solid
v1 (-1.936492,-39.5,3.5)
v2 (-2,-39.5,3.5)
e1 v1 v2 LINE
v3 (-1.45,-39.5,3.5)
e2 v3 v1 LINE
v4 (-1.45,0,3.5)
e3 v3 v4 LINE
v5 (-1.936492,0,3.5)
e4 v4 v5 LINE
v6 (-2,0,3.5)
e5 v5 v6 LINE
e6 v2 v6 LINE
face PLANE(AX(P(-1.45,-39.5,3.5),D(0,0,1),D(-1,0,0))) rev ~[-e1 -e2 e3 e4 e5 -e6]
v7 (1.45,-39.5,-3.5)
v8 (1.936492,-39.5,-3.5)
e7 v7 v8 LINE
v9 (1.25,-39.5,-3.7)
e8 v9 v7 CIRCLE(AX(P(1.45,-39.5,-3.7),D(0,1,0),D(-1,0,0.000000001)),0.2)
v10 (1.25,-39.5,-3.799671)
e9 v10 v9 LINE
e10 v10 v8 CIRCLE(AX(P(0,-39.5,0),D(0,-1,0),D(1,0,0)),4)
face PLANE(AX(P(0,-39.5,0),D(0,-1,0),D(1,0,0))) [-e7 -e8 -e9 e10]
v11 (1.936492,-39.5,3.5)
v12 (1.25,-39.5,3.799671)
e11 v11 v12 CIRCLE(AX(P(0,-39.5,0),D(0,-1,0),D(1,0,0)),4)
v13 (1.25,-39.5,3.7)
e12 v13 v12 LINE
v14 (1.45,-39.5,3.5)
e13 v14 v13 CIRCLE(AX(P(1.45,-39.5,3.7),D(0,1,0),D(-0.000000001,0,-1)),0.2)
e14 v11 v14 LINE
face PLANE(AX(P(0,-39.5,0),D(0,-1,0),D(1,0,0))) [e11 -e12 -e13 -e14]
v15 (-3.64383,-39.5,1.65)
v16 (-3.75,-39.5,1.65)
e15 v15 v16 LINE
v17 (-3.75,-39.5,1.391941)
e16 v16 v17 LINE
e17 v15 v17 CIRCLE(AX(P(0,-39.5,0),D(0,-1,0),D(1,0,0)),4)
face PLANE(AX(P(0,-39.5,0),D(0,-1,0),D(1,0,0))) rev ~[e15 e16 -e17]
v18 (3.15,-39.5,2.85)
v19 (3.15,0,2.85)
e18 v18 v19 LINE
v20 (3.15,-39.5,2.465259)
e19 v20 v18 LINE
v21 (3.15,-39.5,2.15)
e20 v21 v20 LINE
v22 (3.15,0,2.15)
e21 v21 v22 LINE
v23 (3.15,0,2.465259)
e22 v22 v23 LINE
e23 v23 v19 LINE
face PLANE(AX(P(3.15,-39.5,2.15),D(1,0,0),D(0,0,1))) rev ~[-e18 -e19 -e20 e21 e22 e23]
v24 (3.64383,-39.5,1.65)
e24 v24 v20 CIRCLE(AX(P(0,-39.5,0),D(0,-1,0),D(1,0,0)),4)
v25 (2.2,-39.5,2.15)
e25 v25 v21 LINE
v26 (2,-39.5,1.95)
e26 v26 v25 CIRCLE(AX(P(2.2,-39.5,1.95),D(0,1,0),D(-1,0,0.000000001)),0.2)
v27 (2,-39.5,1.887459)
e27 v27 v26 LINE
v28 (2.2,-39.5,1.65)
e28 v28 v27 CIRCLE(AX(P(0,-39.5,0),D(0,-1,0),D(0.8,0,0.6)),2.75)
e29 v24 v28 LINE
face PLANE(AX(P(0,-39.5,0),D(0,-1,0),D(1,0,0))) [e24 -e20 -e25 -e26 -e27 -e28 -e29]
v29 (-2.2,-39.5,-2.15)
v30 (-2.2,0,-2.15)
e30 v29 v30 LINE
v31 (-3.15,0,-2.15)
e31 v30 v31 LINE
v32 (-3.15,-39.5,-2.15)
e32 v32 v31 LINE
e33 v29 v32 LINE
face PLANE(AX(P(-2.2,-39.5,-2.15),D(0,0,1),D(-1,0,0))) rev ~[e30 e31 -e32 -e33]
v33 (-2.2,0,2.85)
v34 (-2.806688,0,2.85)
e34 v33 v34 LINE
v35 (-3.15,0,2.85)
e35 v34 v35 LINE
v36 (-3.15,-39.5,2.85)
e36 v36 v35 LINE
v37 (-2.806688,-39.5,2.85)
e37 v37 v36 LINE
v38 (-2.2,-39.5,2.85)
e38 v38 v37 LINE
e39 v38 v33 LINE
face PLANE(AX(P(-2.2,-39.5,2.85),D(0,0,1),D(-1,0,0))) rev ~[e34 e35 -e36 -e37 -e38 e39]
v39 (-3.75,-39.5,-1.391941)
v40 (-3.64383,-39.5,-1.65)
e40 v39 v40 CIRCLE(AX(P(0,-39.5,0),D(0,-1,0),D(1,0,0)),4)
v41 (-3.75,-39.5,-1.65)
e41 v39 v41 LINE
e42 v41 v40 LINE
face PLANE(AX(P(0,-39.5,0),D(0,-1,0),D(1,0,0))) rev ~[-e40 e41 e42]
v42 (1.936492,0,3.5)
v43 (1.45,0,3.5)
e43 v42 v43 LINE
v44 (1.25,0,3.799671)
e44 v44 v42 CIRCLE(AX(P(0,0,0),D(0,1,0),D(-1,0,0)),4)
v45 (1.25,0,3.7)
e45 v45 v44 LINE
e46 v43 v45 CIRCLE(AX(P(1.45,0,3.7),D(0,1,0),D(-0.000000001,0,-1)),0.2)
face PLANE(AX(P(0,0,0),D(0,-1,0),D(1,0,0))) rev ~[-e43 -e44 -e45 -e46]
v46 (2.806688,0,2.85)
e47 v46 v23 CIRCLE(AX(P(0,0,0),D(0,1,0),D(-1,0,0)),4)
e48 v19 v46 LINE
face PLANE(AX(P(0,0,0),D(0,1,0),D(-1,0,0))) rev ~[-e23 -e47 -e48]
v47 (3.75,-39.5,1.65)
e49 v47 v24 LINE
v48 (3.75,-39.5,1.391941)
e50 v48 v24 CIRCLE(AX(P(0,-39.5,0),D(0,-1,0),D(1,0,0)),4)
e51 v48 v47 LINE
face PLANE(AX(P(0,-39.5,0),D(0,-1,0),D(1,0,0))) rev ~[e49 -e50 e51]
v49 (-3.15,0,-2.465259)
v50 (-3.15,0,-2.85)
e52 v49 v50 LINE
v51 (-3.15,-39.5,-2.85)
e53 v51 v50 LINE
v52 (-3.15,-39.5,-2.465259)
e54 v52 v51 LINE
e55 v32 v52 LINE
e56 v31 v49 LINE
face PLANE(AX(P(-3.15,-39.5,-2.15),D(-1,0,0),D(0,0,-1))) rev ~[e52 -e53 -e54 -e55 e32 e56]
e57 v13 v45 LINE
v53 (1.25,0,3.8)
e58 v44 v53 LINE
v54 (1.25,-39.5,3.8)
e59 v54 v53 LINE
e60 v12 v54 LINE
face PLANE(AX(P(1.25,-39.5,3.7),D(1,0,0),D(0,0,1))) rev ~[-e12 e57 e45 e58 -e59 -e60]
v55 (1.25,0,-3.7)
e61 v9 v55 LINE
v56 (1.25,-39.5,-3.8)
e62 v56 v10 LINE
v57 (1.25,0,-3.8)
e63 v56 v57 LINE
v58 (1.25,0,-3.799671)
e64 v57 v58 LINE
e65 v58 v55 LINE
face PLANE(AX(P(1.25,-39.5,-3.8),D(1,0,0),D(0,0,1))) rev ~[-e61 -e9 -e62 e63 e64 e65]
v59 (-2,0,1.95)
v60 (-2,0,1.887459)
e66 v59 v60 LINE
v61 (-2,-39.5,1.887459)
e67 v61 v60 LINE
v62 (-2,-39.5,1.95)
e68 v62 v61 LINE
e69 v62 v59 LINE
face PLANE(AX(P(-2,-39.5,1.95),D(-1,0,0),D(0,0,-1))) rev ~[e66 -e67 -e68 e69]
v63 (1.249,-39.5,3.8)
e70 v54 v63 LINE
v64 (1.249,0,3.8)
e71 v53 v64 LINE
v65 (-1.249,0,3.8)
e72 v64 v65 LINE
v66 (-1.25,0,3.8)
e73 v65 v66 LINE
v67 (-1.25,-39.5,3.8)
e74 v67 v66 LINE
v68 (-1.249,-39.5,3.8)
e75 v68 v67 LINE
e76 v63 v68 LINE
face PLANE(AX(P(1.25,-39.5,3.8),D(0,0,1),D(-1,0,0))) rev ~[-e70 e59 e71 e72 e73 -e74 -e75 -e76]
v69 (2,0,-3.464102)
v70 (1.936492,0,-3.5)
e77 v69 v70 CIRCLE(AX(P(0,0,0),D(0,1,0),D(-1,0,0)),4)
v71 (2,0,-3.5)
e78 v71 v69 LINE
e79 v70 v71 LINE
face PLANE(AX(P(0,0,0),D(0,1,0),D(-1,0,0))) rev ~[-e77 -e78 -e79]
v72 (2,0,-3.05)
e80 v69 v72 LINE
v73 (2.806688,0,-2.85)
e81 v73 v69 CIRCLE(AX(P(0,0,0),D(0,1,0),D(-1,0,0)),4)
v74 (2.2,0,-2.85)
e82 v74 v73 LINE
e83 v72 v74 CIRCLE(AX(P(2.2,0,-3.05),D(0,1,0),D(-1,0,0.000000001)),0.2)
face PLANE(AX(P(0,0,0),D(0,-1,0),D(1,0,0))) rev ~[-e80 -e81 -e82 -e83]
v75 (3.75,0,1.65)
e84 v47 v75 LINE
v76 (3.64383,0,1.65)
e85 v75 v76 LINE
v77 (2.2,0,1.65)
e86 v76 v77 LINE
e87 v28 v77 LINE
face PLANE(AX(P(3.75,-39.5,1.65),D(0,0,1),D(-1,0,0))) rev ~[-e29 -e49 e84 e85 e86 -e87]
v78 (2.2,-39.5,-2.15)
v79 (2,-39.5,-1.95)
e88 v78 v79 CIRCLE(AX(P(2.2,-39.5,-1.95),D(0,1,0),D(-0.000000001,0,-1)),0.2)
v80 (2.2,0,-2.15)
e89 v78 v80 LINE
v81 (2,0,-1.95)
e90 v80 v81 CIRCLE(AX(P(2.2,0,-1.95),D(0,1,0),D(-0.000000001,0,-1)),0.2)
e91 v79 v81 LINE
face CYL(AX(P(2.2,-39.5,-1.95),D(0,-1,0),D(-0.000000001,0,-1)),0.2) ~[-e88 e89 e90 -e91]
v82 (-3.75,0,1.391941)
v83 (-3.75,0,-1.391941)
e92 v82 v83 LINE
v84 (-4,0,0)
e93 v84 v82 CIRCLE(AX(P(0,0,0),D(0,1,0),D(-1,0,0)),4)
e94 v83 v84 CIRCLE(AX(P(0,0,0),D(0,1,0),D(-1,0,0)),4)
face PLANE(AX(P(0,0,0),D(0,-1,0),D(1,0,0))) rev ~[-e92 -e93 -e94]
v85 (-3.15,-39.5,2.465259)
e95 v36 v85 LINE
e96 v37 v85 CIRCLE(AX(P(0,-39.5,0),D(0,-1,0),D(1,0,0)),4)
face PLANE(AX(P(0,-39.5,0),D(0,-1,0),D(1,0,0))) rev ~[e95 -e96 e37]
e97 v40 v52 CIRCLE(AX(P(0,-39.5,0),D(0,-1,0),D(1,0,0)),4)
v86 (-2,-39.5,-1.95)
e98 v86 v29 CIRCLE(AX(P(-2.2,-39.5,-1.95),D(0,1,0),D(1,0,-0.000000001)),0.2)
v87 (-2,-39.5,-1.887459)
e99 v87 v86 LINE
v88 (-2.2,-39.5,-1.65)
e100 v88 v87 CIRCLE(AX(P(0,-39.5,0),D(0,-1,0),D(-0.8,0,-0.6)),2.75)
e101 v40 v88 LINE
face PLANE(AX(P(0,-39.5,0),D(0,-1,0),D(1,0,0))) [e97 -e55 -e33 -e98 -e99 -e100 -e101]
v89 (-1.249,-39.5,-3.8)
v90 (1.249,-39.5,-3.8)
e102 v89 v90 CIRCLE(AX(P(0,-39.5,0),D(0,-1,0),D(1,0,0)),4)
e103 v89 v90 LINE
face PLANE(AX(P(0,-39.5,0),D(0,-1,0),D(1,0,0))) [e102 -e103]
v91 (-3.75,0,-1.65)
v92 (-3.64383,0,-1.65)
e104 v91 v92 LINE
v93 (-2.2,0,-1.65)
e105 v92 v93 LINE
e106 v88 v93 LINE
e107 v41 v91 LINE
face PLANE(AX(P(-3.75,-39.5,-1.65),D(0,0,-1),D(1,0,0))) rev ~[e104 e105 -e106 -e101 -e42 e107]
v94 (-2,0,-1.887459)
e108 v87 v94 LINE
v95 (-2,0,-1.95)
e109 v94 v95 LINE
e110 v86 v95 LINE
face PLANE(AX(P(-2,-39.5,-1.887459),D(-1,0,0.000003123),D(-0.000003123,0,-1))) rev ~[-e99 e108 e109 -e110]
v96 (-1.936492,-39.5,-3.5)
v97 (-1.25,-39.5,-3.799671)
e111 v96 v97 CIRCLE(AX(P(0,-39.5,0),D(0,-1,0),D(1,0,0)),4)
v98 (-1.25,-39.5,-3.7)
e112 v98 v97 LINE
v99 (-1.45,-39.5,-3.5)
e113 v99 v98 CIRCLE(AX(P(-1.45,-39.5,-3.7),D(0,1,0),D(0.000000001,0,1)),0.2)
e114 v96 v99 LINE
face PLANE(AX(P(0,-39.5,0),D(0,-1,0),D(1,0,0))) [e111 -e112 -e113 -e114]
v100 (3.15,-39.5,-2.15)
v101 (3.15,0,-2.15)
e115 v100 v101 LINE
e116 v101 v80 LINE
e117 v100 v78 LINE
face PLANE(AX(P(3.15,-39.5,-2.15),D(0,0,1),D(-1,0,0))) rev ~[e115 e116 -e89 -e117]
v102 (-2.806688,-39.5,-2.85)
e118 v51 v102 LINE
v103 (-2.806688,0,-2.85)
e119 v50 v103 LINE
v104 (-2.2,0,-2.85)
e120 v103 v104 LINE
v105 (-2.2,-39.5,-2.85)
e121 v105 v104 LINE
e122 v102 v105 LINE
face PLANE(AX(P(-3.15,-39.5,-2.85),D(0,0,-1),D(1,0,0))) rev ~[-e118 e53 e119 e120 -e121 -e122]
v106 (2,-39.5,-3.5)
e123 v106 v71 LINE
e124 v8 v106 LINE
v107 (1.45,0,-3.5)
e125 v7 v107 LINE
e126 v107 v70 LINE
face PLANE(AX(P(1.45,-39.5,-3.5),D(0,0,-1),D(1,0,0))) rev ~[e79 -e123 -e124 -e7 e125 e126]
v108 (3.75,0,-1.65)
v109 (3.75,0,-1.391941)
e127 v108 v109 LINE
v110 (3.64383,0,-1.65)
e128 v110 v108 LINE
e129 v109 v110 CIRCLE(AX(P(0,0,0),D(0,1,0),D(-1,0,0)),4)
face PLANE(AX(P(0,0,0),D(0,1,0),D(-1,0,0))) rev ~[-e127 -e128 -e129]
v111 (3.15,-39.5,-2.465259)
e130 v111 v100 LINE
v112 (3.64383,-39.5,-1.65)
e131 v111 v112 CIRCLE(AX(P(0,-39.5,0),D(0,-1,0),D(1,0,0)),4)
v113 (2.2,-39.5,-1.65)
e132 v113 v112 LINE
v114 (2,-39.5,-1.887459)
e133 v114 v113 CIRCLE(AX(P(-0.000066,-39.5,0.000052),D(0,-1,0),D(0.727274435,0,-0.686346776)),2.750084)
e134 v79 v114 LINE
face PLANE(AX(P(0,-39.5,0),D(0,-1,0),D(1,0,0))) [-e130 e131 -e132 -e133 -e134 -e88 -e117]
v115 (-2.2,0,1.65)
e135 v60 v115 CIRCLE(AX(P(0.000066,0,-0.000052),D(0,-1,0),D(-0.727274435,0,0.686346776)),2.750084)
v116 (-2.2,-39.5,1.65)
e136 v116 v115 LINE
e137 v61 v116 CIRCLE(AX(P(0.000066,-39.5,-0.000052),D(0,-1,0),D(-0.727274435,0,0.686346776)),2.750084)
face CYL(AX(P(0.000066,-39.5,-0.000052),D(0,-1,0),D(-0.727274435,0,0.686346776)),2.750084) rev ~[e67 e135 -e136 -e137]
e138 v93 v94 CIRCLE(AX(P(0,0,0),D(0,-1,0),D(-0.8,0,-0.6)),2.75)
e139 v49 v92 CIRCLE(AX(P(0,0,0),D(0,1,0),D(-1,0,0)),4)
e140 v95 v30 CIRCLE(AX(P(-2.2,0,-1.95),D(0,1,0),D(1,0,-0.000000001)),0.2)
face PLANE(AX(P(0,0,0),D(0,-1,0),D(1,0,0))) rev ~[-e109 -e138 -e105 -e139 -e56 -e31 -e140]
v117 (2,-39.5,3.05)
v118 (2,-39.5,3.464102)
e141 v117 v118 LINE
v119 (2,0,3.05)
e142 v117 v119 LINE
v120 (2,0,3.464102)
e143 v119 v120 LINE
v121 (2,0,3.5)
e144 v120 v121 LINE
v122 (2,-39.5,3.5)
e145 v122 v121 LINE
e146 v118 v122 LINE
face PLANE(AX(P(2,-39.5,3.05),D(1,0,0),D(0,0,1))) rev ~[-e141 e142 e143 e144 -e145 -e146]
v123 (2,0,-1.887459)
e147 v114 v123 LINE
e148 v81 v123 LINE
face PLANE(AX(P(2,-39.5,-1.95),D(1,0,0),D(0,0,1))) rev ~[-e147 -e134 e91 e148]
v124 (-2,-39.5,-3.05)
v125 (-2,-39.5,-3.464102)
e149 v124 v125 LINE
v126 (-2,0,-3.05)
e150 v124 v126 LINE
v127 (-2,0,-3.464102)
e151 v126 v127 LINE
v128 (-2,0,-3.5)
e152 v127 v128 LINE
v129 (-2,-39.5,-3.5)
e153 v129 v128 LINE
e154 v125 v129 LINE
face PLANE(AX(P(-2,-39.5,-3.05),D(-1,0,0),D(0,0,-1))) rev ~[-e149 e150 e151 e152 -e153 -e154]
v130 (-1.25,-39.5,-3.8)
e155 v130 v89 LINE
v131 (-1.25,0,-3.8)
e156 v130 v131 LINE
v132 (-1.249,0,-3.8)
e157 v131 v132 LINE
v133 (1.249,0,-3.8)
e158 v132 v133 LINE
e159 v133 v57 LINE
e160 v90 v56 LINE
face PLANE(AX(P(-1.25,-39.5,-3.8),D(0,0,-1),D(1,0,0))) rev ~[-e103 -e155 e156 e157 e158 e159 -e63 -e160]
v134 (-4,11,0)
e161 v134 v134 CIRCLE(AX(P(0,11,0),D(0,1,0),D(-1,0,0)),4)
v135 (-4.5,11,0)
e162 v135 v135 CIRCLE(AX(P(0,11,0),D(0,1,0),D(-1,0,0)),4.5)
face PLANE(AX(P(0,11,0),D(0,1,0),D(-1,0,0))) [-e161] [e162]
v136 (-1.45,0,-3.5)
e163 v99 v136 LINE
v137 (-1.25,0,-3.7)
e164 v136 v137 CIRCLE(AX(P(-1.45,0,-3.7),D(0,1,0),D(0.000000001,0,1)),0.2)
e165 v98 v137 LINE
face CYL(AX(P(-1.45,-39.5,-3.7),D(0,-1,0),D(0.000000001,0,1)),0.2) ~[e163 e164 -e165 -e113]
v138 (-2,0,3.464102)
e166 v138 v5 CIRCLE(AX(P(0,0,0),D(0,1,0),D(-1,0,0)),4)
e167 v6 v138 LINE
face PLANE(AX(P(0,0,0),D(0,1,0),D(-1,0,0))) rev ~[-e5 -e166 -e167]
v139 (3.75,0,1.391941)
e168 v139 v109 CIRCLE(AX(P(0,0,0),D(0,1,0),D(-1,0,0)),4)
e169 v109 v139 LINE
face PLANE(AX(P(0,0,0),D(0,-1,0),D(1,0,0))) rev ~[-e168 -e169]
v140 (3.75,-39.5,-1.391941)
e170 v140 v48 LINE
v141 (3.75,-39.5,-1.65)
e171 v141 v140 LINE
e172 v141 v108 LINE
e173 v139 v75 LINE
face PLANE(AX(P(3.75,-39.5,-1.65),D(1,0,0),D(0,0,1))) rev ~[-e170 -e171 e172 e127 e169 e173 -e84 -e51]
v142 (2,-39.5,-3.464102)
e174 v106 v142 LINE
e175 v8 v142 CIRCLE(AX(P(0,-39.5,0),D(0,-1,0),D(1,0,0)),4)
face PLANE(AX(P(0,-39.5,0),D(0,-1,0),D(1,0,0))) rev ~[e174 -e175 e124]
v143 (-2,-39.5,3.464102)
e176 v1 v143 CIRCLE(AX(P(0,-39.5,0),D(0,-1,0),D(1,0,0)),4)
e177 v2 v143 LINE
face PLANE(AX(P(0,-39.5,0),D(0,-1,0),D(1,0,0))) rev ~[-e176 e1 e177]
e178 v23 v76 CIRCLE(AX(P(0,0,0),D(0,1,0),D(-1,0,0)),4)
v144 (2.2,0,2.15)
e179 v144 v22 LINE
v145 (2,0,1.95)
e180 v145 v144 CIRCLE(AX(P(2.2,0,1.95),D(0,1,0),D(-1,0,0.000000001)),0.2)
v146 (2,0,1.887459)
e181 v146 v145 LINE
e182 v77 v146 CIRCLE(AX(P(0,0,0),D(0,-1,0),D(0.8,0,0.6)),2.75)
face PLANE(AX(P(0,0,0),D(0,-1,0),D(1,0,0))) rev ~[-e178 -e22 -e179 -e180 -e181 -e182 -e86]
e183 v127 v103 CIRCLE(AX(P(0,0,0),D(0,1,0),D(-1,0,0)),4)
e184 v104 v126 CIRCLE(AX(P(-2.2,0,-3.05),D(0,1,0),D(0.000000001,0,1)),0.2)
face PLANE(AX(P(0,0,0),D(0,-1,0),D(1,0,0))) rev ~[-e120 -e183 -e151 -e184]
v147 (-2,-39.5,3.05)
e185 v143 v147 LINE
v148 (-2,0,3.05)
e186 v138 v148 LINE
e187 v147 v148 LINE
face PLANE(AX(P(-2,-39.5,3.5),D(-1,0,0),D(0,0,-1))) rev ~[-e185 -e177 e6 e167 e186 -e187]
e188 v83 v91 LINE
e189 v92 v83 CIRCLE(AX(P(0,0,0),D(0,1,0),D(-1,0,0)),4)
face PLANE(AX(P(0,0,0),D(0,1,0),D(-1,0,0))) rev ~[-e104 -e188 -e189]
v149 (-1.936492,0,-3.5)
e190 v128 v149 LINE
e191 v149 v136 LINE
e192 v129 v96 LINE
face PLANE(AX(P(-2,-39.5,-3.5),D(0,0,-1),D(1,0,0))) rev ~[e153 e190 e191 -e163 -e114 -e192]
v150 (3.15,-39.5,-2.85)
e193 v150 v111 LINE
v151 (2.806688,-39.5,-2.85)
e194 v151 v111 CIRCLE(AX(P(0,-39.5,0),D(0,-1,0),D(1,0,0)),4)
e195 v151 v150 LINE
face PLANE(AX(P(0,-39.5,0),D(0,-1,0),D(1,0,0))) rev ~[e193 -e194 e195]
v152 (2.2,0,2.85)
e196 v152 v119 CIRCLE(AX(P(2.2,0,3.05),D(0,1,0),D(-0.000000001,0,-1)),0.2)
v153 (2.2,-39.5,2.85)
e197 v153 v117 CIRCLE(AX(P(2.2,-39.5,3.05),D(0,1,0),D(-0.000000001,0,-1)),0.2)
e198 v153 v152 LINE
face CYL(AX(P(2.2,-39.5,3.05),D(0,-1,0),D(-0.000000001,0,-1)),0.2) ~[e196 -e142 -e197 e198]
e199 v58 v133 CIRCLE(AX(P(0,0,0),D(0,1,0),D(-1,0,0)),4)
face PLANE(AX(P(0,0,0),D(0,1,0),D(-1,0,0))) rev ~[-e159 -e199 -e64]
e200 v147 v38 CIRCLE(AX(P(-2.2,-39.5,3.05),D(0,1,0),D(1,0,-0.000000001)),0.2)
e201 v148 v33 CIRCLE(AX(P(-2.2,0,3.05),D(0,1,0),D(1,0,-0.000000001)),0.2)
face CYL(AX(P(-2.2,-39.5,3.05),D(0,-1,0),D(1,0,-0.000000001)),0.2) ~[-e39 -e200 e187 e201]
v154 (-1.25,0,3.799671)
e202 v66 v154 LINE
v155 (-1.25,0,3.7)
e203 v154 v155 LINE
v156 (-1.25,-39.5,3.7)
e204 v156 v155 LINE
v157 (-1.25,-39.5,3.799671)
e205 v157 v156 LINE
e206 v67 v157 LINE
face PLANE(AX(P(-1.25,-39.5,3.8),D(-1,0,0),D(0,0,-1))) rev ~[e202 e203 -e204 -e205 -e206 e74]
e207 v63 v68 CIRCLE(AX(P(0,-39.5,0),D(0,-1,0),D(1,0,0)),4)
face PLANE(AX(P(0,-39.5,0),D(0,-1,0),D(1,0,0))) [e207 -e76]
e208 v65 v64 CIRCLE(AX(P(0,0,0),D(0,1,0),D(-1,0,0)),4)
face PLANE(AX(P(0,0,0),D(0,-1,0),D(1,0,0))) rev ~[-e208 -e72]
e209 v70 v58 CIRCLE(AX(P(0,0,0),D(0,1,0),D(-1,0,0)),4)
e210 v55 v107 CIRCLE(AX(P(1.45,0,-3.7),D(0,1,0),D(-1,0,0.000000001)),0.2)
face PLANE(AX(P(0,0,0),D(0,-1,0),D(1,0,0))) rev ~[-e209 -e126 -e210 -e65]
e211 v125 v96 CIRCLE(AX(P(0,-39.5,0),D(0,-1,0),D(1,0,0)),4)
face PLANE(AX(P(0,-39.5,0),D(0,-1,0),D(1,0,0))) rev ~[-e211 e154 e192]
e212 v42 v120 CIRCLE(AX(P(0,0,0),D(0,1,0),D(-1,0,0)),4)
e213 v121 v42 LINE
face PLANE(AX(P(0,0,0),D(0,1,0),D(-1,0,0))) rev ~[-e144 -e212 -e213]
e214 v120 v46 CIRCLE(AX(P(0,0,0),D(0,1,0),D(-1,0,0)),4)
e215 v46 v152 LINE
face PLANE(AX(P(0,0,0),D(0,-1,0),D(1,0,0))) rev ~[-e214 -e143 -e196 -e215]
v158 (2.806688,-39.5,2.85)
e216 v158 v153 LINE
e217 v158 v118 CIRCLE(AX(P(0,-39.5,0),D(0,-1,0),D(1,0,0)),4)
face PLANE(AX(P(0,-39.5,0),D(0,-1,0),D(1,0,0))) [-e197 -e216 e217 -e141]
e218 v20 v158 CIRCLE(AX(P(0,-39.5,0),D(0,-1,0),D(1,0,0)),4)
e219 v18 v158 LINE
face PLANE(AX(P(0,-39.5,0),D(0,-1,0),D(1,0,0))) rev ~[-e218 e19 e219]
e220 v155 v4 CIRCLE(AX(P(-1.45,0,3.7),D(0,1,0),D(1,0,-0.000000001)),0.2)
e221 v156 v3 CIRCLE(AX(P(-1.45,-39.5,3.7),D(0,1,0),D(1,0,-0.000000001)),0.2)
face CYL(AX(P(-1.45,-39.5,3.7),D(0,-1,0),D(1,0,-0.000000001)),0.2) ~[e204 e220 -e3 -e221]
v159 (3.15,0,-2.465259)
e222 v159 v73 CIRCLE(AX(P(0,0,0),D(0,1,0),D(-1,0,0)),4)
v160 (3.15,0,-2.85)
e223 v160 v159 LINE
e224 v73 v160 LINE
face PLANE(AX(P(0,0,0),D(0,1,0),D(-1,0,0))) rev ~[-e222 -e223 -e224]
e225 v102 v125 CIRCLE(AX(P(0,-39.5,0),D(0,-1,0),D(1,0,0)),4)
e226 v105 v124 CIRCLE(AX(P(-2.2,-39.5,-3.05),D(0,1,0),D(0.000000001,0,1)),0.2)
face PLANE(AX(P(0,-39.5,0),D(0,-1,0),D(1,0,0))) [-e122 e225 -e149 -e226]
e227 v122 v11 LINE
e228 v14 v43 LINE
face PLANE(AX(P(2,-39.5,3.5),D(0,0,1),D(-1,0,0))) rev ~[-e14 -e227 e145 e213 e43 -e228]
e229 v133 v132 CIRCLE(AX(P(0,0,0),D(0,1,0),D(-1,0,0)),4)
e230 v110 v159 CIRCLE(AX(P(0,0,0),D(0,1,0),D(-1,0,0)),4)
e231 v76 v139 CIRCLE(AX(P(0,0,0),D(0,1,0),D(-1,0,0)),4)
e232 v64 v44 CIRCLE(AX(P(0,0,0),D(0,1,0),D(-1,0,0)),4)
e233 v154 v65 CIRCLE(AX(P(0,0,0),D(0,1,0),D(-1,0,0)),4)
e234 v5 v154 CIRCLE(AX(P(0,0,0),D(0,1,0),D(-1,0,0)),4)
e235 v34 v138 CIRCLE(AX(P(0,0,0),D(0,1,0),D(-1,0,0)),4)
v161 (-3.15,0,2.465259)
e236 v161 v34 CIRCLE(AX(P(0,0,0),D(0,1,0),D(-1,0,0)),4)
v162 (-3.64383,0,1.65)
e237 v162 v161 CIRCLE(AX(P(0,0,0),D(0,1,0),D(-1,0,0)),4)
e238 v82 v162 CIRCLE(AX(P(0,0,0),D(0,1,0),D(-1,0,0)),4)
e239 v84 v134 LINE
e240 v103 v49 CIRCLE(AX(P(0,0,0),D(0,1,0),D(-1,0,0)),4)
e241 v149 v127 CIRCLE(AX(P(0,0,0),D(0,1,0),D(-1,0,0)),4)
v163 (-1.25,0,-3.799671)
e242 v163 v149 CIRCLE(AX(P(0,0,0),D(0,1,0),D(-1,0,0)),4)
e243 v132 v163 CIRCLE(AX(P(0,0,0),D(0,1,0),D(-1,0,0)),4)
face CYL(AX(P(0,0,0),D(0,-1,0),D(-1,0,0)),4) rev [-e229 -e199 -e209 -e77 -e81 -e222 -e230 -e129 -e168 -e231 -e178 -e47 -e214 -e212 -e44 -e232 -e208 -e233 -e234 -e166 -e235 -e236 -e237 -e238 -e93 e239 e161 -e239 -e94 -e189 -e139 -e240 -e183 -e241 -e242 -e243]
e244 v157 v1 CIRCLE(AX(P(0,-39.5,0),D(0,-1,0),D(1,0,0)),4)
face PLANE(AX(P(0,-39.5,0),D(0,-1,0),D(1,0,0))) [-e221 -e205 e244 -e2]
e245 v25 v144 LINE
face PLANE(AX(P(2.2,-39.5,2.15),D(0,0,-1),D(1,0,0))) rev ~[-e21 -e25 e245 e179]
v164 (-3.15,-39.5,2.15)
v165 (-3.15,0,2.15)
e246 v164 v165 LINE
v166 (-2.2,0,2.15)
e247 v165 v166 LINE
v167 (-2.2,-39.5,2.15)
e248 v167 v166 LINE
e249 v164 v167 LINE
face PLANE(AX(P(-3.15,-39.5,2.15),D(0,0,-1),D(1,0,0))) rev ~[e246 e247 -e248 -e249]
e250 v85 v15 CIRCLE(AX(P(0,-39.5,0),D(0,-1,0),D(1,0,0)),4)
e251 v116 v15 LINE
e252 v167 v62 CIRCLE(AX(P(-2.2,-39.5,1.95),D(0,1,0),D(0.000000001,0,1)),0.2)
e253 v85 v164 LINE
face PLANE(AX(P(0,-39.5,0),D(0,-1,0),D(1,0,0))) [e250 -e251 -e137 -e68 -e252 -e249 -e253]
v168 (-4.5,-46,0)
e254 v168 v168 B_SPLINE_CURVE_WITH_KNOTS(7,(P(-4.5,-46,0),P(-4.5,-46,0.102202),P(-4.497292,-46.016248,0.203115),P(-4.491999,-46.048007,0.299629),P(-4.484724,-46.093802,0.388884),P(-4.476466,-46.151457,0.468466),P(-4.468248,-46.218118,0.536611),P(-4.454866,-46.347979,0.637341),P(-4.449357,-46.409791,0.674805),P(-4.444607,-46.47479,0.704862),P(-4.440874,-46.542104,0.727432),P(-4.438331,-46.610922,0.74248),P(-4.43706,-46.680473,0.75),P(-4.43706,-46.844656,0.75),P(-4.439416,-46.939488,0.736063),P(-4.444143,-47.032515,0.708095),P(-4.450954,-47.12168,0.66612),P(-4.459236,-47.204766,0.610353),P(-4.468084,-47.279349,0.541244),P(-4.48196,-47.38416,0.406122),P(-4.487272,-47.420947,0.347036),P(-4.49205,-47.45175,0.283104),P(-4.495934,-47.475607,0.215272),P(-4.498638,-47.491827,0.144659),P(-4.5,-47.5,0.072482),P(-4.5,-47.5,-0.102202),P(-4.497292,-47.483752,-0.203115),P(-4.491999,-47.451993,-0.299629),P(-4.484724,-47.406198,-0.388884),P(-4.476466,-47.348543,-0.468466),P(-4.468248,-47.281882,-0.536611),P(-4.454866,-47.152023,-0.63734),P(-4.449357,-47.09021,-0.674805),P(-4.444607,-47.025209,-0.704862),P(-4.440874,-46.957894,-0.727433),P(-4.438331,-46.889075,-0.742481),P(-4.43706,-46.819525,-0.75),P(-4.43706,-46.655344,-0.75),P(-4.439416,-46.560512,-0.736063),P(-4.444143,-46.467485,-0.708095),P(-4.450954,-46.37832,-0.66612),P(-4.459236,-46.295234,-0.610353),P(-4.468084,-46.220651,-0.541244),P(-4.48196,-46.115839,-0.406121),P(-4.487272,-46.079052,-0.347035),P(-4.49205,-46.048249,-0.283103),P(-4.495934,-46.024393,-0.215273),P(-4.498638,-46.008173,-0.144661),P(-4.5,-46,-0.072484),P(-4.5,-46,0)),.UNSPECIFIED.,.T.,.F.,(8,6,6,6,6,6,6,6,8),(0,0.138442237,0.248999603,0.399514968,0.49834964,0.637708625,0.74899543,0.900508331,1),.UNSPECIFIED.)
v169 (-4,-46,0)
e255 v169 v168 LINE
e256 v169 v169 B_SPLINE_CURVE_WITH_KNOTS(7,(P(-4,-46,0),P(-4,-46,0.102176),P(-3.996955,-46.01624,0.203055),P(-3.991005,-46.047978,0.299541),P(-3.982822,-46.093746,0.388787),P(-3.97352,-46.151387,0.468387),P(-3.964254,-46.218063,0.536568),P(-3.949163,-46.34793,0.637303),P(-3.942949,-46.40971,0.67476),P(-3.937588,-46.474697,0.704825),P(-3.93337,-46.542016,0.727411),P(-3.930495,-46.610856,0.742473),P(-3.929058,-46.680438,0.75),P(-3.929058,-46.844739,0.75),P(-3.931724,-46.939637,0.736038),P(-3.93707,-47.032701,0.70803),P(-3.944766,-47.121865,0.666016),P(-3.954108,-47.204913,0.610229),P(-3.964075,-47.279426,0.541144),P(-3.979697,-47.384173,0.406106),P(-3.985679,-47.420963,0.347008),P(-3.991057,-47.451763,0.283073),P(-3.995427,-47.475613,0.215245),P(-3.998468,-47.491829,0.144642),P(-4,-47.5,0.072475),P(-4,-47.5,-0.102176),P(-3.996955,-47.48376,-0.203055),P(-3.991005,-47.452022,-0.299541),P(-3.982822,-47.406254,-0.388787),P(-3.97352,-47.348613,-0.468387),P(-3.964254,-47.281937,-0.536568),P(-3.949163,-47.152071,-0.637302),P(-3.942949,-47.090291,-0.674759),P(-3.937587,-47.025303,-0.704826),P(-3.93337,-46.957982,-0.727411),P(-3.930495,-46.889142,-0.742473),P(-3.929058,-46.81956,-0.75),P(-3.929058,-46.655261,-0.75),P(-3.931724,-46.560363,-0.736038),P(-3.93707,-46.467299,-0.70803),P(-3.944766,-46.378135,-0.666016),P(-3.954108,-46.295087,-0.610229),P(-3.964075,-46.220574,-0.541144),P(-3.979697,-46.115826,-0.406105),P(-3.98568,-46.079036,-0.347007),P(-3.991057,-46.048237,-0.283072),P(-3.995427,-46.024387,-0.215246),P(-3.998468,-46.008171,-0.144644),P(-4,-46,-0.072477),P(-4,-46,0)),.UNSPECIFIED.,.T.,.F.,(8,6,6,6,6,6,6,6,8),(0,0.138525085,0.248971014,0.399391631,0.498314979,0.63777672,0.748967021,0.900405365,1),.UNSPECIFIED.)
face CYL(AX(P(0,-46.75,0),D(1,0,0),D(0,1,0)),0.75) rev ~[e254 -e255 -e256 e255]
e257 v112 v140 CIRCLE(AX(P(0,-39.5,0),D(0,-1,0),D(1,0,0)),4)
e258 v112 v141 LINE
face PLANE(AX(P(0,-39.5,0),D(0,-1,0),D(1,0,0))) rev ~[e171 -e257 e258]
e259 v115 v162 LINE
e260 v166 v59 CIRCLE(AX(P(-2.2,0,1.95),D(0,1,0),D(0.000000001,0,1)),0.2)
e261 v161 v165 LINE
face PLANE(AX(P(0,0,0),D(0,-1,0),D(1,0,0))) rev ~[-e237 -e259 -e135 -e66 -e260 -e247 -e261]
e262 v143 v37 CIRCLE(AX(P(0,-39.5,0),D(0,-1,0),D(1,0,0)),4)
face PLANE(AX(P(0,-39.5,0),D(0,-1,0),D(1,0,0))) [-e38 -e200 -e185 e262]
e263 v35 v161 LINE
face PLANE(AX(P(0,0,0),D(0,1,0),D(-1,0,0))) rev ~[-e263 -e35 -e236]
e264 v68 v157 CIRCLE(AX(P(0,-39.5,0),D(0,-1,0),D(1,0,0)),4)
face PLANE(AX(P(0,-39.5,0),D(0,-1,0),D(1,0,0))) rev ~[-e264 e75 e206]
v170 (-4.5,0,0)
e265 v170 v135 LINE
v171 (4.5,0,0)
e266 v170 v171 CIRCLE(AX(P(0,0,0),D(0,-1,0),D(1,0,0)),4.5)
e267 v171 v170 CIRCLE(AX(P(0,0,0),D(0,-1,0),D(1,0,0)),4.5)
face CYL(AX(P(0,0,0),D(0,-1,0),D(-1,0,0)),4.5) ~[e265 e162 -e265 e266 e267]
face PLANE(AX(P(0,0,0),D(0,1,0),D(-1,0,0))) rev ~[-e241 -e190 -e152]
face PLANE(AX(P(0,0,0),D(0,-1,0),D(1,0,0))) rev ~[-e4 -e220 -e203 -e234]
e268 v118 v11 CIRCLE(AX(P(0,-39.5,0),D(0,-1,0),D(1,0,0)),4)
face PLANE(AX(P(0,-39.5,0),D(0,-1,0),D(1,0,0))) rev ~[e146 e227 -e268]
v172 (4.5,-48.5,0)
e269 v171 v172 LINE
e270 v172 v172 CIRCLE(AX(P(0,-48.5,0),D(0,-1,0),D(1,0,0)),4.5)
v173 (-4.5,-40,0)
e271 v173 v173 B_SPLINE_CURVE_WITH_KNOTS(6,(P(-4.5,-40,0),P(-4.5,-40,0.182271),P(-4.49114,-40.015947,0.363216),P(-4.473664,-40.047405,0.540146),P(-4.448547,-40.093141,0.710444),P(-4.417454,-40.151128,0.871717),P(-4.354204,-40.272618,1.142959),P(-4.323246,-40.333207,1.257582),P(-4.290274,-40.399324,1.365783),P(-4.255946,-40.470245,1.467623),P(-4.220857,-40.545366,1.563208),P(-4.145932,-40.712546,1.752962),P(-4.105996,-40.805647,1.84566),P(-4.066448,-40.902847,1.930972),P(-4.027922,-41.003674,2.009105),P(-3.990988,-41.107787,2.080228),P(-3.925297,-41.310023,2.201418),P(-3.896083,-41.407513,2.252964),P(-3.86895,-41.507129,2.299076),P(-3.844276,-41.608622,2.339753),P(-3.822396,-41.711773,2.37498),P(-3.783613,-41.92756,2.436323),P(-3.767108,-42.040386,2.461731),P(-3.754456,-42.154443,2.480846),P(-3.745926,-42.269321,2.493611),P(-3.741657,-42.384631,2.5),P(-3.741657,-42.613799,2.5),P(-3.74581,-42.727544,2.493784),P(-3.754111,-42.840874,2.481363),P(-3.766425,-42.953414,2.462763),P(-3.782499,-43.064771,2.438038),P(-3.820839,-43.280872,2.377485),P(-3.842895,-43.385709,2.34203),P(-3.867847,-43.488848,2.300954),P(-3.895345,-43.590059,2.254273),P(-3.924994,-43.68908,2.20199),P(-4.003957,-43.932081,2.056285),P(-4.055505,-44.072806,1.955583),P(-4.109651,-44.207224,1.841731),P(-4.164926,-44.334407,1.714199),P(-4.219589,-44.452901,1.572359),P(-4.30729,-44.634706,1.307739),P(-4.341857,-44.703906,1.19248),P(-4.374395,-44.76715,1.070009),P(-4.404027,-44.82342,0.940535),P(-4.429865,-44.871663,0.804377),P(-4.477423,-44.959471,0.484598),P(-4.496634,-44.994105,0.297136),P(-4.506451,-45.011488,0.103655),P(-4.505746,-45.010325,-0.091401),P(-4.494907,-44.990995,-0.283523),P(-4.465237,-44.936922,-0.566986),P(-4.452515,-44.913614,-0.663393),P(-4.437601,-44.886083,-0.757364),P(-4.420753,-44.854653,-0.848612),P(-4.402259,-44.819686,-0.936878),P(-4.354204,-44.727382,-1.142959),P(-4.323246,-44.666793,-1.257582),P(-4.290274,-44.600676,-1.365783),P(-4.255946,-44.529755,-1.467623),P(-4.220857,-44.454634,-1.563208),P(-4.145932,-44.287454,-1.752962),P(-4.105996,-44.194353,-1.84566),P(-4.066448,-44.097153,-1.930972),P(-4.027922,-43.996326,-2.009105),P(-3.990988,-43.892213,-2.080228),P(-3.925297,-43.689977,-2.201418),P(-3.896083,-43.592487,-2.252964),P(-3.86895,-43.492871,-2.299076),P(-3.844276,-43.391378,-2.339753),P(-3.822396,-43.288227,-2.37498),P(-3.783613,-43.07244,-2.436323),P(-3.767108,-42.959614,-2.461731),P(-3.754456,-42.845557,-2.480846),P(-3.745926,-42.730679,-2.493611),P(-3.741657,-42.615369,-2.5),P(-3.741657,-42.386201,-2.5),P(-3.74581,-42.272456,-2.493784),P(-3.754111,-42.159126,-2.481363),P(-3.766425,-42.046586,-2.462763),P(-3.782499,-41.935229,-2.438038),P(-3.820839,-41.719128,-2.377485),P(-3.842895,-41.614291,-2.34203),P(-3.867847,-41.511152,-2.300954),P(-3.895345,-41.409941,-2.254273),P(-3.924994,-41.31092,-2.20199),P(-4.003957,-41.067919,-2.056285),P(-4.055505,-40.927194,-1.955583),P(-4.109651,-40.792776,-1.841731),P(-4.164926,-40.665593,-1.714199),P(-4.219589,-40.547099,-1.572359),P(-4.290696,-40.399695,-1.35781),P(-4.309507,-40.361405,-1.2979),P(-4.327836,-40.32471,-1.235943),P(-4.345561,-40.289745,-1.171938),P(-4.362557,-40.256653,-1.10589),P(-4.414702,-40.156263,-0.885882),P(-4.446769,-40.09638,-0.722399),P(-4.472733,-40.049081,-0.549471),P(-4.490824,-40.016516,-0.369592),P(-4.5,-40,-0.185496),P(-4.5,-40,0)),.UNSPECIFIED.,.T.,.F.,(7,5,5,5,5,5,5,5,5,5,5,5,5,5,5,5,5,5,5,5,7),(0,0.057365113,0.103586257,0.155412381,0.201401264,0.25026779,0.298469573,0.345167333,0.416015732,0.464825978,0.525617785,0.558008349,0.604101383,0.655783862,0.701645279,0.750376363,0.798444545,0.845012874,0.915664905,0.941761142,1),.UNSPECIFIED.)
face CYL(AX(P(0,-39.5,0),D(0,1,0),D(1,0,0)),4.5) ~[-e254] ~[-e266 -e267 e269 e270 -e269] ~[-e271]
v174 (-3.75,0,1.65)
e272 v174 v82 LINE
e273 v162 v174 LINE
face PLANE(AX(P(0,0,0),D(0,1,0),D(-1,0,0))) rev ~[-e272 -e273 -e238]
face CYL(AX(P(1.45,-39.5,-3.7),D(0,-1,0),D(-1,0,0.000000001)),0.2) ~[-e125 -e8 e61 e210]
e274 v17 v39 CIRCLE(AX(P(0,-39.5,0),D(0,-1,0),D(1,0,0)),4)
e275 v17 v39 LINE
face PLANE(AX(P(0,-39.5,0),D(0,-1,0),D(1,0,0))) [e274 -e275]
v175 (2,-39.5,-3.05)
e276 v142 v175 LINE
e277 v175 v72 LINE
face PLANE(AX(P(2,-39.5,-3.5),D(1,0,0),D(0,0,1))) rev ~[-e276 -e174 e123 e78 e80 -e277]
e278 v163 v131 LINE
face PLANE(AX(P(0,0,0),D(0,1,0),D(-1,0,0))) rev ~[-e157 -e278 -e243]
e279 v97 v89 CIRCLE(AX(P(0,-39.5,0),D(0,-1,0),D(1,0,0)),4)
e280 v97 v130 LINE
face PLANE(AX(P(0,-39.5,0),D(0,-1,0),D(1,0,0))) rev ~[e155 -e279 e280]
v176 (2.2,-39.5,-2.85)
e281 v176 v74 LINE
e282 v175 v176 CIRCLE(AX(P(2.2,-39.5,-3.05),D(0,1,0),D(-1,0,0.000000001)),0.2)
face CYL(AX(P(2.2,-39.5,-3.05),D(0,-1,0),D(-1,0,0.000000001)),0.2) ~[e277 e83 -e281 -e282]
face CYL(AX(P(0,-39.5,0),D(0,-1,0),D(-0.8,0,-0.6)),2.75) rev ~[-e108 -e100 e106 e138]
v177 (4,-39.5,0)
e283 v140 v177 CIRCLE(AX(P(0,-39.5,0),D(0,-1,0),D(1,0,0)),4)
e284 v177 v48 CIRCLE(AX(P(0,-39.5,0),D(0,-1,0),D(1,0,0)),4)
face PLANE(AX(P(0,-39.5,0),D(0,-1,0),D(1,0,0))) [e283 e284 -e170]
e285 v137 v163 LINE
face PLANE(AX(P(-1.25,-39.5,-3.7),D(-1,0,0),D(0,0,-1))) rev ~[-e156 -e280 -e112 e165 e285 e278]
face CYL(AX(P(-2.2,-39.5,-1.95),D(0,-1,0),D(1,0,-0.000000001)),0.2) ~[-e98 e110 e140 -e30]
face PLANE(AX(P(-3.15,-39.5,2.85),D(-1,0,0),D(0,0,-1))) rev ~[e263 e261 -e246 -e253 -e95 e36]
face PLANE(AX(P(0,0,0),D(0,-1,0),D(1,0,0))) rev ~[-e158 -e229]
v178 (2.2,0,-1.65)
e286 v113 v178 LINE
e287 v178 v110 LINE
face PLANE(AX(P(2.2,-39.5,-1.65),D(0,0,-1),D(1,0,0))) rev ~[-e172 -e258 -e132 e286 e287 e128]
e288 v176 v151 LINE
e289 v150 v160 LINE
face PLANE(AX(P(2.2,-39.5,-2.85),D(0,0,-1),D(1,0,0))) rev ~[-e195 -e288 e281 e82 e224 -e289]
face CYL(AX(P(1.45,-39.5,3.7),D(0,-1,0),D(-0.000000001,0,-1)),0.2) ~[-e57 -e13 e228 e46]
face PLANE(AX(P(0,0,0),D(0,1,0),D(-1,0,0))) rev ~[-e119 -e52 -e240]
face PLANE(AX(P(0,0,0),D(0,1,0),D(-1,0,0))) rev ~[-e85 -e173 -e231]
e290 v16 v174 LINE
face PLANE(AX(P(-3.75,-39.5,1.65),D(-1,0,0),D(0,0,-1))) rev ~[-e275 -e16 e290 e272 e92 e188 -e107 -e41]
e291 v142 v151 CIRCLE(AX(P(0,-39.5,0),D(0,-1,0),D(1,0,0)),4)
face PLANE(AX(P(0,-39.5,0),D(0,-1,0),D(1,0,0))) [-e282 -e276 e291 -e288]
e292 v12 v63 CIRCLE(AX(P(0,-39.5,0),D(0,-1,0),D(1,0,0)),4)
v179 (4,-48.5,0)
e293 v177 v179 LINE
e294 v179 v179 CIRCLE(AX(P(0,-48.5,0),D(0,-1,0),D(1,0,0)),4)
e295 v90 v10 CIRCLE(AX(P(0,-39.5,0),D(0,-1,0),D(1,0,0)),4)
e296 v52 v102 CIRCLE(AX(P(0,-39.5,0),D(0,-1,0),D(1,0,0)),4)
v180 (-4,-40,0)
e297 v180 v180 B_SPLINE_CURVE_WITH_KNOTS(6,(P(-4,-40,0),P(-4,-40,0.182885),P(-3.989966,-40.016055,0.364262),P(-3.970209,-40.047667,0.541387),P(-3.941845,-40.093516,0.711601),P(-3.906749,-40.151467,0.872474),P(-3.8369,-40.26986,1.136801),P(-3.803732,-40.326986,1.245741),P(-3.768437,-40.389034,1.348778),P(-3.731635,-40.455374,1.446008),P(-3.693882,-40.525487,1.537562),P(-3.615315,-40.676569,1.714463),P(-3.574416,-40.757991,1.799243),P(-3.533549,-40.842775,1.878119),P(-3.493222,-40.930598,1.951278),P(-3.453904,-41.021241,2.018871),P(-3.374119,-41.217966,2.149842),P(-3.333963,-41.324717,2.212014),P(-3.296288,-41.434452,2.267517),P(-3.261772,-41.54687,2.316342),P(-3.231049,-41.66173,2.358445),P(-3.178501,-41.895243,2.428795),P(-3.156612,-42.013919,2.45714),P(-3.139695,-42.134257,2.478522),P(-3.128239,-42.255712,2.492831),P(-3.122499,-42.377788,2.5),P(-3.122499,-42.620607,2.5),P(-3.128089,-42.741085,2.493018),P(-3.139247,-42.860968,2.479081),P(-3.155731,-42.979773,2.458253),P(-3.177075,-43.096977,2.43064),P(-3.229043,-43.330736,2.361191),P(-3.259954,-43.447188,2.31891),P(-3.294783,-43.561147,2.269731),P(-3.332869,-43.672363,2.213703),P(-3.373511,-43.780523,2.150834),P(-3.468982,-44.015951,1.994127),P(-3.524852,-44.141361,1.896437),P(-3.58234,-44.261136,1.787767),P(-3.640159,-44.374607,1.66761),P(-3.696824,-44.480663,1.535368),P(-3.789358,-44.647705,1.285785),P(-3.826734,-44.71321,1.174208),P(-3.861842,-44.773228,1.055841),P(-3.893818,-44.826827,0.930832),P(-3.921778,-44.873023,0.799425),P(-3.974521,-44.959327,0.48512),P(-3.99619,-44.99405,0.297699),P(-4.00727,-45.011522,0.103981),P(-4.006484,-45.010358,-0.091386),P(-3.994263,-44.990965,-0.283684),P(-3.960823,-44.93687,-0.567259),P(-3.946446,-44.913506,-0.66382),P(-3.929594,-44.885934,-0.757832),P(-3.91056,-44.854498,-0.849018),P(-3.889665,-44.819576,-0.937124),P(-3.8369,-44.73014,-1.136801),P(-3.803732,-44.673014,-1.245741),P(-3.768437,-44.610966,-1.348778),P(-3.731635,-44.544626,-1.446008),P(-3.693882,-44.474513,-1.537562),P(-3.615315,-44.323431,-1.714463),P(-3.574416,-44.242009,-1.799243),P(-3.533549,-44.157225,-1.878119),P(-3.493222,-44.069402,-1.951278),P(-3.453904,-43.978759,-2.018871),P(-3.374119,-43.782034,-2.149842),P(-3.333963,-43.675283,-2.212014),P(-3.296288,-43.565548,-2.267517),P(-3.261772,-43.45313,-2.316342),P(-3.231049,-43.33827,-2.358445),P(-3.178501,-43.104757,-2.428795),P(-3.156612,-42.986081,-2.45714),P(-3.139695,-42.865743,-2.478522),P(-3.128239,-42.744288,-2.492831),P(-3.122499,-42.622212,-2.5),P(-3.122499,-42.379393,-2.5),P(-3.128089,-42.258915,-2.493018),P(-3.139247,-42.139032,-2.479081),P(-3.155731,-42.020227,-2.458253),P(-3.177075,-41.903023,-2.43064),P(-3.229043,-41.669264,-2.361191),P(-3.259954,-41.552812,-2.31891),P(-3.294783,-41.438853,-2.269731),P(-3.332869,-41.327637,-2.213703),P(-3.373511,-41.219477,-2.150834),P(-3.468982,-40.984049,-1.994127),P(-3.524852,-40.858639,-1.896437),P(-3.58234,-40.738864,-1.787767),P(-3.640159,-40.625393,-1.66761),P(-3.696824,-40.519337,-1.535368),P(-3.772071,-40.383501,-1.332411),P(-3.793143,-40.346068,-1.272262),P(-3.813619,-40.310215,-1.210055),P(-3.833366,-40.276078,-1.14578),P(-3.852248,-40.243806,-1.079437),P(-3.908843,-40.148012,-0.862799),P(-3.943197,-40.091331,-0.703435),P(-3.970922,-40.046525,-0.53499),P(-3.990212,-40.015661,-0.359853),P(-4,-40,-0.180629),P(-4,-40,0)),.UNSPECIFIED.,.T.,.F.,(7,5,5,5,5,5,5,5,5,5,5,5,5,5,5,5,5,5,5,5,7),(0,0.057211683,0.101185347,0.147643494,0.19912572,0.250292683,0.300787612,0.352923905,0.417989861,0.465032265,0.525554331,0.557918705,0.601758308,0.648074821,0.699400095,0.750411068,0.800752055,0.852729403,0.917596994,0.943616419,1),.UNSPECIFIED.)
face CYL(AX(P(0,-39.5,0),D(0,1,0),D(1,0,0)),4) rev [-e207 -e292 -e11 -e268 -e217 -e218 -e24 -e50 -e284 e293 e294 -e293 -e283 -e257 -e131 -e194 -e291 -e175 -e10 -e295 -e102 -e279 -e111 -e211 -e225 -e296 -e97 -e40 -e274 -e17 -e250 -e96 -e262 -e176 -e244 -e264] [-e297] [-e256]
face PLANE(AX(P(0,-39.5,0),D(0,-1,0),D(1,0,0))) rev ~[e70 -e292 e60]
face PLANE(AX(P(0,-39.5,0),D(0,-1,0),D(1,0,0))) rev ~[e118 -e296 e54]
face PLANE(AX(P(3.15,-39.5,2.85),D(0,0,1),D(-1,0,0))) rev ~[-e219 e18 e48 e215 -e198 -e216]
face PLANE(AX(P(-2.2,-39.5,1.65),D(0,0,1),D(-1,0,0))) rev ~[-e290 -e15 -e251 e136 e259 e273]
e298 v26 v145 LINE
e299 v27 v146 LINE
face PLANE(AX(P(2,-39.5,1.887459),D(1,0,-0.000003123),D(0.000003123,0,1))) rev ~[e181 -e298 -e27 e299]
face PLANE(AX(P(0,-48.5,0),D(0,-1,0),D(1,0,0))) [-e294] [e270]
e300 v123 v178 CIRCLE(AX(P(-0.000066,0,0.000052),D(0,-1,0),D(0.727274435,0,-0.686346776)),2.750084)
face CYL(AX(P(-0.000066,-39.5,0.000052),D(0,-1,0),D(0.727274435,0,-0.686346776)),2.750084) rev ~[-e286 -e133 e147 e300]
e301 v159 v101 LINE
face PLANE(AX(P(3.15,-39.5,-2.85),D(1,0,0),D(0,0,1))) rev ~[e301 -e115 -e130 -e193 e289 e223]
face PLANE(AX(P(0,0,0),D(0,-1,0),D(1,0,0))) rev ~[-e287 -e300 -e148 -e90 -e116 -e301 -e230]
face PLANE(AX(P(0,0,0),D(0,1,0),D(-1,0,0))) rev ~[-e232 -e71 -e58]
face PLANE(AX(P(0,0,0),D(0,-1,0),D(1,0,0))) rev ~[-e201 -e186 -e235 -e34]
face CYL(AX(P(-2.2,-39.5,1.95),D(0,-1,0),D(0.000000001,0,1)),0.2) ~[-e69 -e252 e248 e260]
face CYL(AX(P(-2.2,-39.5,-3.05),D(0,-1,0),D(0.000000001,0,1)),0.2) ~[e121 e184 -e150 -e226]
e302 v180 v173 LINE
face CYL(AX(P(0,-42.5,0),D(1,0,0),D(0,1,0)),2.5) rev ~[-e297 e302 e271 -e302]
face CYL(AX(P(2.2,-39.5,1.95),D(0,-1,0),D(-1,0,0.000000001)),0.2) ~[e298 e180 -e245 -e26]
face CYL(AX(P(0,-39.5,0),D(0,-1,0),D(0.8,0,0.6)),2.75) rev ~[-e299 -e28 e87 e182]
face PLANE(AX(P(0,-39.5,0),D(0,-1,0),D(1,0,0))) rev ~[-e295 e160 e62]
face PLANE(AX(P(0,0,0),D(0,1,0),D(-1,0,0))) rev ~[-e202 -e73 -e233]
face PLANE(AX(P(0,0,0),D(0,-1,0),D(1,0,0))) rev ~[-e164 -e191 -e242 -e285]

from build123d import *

# Parameters (mm, degrees)
F3_R      = 4.5
F4_DEPTH  = 39.5
F8_DEPTH  = 39.5
F6_R      = 4.5
F6_R_2    = 4
F9_DEPTH  = 9
F7_R      = 4.5
F7_R_2    = 4
F10_DEPTH = 11
F11_R     = 2.5
F11_R_2   = 0.75
F12_DEPTH = 4.501


# Not quite as in the source:
# - ends of sketch curves that miss each other by under 0.0002 mm in the source are joined


with BuildPart() as f4:
    # F3 (on Front) → F4 (new body)
    with BuildSketch(Plane.XZ):
        Circle(F3_R)
    extrude(amount=F4_DEPTH)

    # F5 (on face) → F8 (cut, through all)
    with BuildSketch(Plane.XZ.offset(39.5)):
        with BuildLine():
            Line((-1.25, -3.8), (0, -3.8))
            Line((0, -3.8), (1.25, -3.8))
            Line((1.25, -3.8), (1.25, -3.7))
            ThreePointArc((1.25, -3.7), (1.3085786438, -3.5585786438), (1.45, -3.5))
            Line((1.45, -3.5), (2, -3.5))
            Line((2, -3.5), (2, -3.05))
            ThreePointArc((2, -3.05), (2.0585786438, -2.9085786438), (2.2, -2.85))
            Line((2.2, -2.85), (3.15, -2.85))
            Line((3.15, -2.85), (3.15, -2.15))
            Line((3.15, -2.15), (2.2, -2.15))
            ThreePointArc((2.2, -2.15), (2.0585786438, -2.0914213562), (2, -1.95))
            Line((2, -1.95), (2, -1.887459))
            ThreePointArc((2, -1.887459), (2.1033535752, -1.771554046), (2.2, -1.65))
            Line((2.2, -1.65), (3.75, -1.65))
            Line((3.75, -1.65), (3.75, 0))
            Line((3.75, 0), (3.75, 1.65))
            Line((3.75, 1.65), (2.2, 1.65))
            ThreePointArc((2.2, 1.65), (2.1033535752, 1.771554046), (1.9999998047, 1.8874588157))
            Line((1.9999998047, 1.8874588157), (2, 1.95))
            ThreePointArc((2, 1.95), (2.0585786438, 2.0914213562), (2.2, 2.15))
            Line((2.2, 2.15), (3.15, 2.15))
            Line((3.15, 2.15), (3.15, 2.85))
            Line((3.15, 2.85), (2.2, 2.85))
            ThreePointArc((2.2, 2.85), (2.0585786438, 2.9085786438), (2, 3.05))
            Line((2, 3.05), (2, 3.5))
            Line((2, 3.5), (1.45, 3.5))
            ThreePointArc((1.45, 3.5), (1.3085786438, 3.5585786438), (1.25, 3.7))
            Line((1.25, 3.7), (1.25, 3.8))
            Line((1.25, 3.8), (0, 3.8))
            Line((0, 3.8), (-1.25, 3.8))
            Line((-1.25, 3.8), (-1.25, 3.7))
            ThreePointArc((-1.25, 3.7), (-1.3085786438, 3.5585786438), (-1.45, 3.5))
            Line((-1.45, 3.5), (-2, 3.5))
            Line((-2, 3.5), (-2, 3.05))
            ThreePointArc((-2, 3.05), (-2.0585786438, 2.9085786438), (-2.2, 2.85))
            Line((-2.2, 2.85), (-3.15, 2.85))
            Line((-3.15, 2.85), (-3.15, 2.15))
            Line((-3.15, 2.15), (-2.2, 2.15))
            ThreePointArc((-2.2, 2.15), (-2.0585786438, 2.0914213562), (-2, 1.95))
            Line((-2, 1.95), (-2, 1.887459))
            ThreePointArc((-2, 1.887459), (-2.1033535752, 1.771554046), (-2.2, 1.65))
            Line((-2.2, 1.65), (-3.75, 1.65))
            Line((-3.75, 1.65), (-3.75, 0))
            Line((-3.75, 0), (-3.75, -1.65))
            Line((-3.75, -1.65), (-2.2, -1.65))
            ThreePointArc((-2.2, -1.65), (-2.1033535752, -1.771554046), (-1.9999998047, -1.8874588157))
            Line((-1.9999998047, -1.8874588157), (-2, -1.95))
            ThreePointArc((-2, -1.95), (-2.0585786438, -2.0914213562), (-2.2, -2.15))
            Line((-2.2, -2.15), (-3.15, -2.15))
            Line((-3.15, -2.15), (-3.15, -2.85))
            Line((-3.15, -2.85), (-2.2, -2.85))
            ThreePointArc((-2.2, -2.85), (-2.0585786438, -2.9085786438), (-2, -3.05))
            Line((-2, -3.05), (-2, -3.5))
            Line((-2, -3.5), (-1.45, -3.5))
            ThreePointArc((-1.45, -3.5), (-1.3085786438, -3.5585786438), (-1.25, -3.7))
            Line((-1.25, -3.7), (-1.25, -3.8))
        make_face()
    extrude(amount=-F8_DEPTH, mode=Mode.SUBTRACT)

    # F6 (on face) → F9 (join)
    with BuildSketch(Plane.XZ.offset(39.5)):
        Circle(F6_R)
        Circle(F6_R_2, mode=Mode.SUBTRACT)
    extrude(amount=F9_DEPTH)

    # F7 (on face) → F10 (join)
    with BuildSketch(Plane(origin=(0, 0, 0), x_dir=(-1, 0, 0), z_dir=(0, 1, 0))):
        Circle(F7_R)
        Circle(F7_R_2, mode=Mode.SUBTRACT)
    extrude(amount=F10_DEPTH)

    # F11 (on Right) → F12 (cut, through all)
    with BuildSketch(Plane.YZ):
        with Locations((-42.5, 0)):
            Circle(F11_R)
        with Locations((-46.75, 0)):
            Circle(F11_R_2)
    extrude(amount=-F12_DEPTH, mode=Mode.SUBTRACT)


solid = f4.part
